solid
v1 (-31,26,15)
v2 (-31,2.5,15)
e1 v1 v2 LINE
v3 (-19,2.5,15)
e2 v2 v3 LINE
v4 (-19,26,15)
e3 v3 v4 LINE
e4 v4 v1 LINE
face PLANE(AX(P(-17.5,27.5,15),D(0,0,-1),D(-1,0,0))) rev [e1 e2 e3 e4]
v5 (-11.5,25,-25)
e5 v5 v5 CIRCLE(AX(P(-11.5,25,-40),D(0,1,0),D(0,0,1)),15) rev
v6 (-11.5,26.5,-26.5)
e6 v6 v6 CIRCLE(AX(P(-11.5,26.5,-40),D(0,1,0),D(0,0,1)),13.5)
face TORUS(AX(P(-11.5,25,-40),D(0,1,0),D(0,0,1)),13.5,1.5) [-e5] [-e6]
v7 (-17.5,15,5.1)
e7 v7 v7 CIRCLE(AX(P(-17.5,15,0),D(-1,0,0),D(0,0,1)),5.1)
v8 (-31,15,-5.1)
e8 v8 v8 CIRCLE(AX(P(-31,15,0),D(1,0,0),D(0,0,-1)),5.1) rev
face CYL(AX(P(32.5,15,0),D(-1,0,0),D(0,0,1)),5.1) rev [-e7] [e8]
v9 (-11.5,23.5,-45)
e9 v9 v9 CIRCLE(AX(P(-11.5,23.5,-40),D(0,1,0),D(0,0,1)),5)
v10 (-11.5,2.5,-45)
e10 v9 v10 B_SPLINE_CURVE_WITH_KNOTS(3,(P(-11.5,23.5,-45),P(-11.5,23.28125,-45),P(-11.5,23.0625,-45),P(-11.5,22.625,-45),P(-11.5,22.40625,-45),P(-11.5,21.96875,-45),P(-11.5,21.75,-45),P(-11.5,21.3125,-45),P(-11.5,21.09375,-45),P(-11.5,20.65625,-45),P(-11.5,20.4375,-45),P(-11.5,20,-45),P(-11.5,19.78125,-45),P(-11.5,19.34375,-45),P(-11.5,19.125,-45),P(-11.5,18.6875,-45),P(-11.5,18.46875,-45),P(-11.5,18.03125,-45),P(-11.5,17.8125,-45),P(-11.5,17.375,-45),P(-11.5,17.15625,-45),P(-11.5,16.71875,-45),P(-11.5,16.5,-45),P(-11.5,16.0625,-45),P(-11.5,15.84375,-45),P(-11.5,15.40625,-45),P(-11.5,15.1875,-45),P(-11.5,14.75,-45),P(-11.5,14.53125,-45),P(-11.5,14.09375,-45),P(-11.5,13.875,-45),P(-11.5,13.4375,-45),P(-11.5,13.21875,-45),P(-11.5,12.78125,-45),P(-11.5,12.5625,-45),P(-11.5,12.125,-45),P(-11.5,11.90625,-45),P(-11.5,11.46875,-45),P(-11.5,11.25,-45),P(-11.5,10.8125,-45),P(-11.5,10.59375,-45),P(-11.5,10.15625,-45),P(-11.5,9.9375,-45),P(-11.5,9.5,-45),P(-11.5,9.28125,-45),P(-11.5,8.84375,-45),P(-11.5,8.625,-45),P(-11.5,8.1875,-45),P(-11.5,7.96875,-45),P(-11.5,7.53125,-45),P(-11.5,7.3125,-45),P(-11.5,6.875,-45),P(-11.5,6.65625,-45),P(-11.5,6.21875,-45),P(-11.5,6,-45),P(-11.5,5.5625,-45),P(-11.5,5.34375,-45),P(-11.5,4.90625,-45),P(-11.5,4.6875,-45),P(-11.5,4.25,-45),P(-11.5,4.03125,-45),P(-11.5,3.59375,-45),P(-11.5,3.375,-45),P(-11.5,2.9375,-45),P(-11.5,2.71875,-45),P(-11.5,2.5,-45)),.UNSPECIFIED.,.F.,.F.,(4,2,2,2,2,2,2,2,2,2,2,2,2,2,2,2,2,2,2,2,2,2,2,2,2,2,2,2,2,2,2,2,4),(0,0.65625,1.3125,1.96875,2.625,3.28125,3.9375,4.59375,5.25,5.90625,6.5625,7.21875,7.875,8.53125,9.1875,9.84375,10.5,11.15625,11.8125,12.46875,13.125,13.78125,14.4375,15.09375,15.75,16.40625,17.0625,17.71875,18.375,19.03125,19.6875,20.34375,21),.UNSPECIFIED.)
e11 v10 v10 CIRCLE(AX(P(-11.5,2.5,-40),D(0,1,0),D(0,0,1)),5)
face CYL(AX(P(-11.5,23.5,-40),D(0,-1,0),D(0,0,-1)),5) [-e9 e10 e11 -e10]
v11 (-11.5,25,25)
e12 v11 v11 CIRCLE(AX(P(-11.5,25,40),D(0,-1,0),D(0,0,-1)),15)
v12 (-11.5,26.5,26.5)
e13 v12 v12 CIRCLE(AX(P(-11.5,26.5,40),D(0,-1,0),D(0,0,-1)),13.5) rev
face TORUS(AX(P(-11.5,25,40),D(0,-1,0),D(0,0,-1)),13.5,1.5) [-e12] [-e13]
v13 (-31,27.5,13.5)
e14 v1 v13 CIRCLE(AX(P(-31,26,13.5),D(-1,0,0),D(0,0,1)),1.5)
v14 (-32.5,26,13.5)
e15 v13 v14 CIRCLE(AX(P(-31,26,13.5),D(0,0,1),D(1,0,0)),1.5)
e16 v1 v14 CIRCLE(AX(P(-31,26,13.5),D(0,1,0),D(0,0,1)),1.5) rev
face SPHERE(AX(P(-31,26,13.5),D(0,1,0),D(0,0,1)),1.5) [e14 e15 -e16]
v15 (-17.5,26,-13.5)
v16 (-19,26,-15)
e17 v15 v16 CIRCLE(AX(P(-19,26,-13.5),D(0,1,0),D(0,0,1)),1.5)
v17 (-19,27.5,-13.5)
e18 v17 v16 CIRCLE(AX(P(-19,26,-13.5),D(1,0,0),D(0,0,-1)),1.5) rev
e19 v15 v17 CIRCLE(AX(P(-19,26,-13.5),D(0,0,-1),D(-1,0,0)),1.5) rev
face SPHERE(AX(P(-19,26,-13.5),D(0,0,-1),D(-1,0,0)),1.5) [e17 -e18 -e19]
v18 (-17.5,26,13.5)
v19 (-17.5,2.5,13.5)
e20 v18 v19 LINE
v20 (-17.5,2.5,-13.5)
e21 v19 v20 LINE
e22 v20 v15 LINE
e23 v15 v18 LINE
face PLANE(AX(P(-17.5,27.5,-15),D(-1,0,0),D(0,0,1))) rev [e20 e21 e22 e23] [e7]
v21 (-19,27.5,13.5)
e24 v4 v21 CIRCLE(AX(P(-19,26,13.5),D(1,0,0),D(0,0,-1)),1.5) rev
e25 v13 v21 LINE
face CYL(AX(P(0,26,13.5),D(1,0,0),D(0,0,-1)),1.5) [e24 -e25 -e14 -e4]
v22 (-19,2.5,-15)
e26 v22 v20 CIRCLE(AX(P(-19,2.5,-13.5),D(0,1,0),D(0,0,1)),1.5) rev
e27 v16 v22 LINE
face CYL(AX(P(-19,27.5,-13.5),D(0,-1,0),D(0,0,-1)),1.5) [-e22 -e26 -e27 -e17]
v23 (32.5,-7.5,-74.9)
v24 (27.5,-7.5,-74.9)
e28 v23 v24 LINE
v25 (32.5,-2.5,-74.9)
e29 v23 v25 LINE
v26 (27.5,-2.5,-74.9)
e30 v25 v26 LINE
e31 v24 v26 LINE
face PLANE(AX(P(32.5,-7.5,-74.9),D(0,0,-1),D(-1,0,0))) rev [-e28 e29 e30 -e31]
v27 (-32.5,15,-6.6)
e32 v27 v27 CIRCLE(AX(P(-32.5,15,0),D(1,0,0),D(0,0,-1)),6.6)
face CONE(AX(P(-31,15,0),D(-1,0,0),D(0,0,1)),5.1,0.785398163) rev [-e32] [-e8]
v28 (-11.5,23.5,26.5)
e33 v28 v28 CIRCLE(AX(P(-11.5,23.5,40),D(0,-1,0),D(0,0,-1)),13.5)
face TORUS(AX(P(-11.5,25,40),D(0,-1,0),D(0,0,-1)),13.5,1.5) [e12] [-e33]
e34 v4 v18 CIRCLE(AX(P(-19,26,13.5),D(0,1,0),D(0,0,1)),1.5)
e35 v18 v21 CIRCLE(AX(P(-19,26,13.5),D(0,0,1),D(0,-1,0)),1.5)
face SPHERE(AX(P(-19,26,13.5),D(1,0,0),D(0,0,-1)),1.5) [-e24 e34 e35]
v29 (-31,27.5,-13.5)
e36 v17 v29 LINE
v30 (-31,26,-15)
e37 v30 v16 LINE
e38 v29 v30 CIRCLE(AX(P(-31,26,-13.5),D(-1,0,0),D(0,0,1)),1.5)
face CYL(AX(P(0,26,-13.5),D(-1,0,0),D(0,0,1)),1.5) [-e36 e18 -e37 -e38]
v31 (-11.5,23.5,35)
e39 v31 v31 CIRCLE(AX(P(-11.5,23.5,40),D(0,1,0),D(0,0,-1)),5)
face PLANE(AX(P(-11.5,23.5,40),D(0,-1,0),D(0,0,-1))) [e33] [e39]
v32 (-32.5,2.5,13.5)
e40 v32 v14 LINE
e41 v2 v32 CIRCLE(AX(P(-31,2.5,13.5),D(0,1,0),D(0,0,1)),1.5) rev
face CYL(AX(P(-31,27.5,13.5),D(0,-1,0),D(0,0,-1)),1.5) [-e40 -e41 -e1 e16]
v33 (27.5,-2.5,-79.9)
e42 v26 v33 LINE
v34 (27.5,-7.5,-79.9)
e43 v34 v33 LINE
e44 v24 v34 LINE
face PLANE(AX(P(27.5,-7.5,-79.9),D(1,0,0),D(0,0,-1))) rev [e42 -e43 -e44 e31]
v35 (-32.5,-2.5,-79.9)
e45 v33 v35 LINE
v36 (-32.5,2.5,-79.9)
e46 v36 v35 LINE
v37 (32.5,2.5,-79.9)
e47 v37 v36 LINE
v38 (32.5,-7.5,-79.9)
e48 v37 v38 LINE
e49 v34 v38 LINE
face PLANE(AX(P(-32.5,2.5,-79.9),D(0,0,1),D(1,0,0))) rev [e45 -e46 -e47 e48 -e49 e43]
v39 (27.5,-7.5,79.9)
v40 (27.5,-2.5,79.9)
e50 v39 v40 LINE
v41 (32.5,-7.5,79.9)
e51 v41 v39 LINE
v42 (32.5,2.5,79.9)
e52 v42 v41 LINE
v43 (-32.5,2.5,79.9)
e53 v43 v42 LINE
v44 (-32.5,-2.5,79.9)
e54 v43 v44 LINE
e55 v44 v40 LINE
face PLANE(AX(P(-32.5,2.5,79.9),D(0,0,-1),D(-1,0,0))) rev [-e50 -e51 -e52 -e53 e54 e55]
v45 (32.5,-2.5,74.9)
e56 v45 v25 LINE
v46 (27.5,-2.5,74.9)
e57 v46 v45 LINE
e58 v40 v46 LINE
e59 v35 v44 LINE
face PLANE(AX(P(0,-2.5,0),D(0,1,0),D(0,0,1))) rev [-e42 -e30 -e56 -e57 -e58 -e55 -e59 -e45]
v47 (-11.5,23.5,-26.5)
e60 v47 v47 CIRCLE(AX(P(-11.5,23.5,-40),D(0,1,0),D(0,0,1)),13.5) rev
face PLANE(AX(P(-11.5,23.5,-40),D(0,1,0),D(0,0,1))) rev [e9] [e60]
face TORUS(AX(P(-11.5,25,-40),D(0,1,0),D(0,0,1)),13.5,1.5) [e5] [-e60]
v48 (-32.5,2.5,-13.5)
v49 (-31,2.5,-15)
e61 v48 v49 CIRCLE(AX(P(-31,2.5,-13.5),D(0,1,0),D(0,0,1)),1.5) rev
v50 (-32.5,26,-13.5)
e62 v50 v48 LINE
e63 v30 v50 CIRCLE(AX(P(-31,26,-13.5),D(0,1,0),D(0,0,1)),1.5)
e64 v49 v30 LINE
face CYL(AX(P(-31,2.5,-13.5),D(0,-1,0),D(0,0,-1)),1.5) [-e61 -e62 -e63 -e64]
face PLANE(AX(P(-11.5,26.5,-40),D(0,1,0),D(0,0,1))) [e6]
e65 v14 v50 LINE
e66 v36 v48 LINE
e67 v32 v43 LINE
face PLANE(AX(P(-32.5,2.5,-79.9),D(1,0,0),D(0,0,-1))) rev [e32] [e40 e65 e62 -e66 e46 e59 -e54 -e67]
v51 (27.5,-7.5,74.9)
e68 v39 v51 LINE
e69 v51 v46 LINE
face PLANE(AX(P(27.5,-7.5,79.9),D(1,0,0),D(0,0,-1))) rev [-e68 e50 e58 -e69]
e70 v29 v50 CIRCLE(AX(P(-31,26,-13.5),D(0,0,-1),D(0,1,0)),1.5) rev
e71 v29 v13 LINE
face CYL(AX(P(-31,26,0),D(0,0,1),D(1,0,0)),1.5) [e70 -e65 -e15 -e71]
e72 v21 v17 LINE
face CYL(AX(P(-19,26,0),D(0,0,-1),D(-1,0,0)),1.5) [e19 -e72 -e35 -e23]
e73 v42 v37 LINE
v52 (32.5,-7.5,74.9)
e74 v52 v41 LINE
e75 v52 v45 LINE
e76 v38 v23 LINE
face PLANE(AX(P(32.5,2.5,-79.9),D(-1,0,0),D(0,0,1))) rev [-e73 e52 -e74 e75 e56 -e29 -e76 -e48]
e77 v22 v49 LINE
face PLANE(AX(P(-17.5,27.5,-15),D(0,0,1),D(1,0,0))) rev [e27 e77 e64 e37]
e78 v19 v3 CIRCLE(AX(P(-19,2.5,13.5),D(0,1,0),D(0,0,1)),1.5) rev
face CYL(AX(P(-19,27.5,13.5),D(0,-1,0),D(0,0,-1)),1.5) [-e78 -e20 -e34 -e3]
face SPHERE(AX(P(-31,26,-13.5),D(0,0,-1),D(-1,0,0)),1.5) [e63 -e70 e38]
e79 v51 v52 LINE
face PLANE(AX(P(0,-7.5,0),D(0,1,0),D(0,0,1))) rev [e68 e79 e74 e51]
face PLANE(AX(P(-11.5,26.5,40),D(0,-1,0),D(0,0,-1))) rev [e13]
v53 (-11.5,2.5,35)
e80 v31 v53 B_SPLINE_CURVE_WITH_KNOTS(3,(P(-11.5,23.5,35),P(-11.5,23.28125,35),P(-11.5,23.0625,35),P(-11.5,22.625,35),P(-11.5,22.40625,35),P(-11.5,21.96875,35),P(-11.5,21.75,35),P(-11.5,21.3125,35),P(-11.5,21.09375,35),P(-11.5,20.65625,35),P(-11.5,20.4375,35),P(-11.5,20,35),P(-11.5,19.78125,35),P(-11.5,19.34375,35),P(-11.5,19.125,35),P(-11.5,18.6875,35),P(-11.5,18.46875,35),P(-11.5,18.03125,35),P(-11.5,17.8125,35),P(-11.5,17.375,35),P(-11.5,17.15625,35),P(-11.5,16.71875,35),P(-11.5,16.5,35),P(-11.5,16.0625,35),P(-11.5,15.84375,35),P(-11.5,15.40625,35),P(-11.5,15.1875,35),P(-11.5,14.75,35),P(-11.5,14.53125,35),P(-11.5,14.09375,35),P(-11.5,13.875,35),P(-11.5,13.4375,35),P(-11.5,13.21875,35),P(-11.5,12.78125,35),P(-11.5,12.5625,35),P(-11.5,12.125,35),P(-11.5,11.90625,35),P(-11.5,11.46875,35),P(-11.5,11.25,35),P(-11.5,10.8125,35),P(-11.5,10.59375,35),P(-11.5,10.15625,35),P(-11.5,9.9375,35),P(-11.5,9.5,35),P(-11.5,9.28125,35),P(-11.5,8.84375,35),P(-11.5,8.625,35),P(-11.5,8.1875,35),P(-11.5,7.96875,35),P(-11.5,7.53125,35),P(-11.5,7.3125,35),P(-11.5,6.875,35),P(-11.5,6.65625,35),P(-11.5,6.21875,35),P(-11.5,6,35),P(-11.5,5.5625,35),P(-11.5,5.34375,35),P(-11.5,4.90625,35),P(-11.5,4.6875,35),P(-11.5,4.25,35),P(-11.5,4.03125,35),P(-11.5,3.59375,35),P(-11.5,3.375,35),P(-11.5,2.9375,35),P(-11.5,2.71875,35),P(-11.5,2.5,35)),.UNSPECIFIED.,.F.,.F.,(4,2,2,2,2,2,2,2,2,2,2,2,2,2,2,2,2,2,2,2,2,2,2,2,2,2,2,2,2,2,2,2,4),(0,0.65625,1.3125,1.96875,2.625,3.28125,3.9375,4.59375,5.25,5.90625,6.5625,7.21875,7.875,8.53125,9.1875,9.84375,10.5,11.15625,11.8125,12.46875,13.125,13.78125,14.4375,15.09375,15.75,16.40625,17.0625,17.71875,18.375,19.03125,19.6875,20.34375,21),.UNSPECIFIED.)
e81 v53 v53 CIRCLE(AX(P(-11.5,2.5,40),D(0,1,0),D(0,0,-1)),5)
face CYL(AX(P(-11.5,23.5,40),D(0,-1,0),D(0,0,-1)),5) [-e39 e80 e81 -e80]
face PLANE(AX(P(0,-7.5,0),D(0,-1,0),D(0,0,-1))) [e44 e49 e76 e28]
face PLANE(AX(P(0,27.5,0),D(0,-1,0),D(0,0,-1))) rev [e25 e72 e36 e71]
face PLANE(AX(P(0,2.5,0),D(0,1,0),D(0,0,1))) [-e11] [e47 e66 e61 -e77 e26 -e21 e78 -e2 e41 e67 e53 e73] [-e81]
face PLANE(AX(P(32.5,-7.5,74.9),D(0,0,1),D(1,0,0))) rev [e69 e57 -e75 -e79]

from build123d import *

# Parameters (mm, degrees)
SKETCH1_W           = 65
SKETCH1_H           = 159.8
BOSS_EXTRUDE1_DEPTH = 2.5
SKETCH2_W           = 15
SKETCH2_H           = 30
BOSS_EXTRUDE2_DEPTH = 25
SKETCH3_R           = 5.1
CUT_EXTRUDE1_DEPTH  = 107.607973435
SKETCH6_W           = 5
SKETCH6_H           = 5
BOSS_EXTRUDE4_DEPTH = 5
SKETCH7_R           = 5
BOSS_EXTRUDE5_DEPTH = 21
SKETCH8_R           = 15
BOSS_EXTRUDE6_DEPTH = 3
FILLET1_R           = 1.5
CHAMFER1_SIZE       = 1.5
FILLET2_R           = 1.5


with BuildPart() as part:
    # Sketch1 → Boss-Extrude1 (new, symmetric)
    with BuildSketch(Plane(origin=(0, 0, 0), x_dir=(1, 0, 0), z_dir=(0, 1, 0))):
        Rectangle(SKETCH1_W, SKETCH1_H)
    extrude(amount=BOSS_EXTRUDE1_DEPTH, both=True)

    # Sketch2 → Boss-Extrude2 (add)
    with BuildSketch(Plane(origin=(0, 2.5, 0), x_dir=(1, 0, 0), z_dir=(0, 1, 0))):
        with Locations((-25, 0)):
            Rectangle(SKETCH2_W, SKETCH2_H)
    extrude(amount=BOSS_EXTRUDE2_DEPTH)

    # Sketch3 → Cut-Extrude1 (cut, through all)
    with BuildSketch(Plane.ZY.offset(32.5)):
        with Locations((0, 15)):
            Circle(SKETCH3_R)
    extrude(amount=-CUT_EXTRUDE1_DEPTH, mode=Mode.SUBTRACT)

    # Sketch6 → Boss-Extrude4 (add)
    with BuildSketch(Plane.XZ.offset(2.5)):
        with Locations((30, 77.4)):
            Rectangle(SKETCH6_W, SKETCH6_H)
        with Locations((30, -77.4)):
            Rectangle(SKETCH6_W, SKETCH6_H)
    extrude(amount=BOSS_EXTRUDE4_DEPTH)

    # Sketch7 → Boss-Extrude5 (add)
    with BuildSketch(Plane(origin=(0, 2.5, 0), x_dir=(1, 0, 0), z_dir=(0, 1, 0))):
        with Locations(Location((-11.5, 40, 0), (0, 0, 90))):
            Circle(SKETCH7_R)
        with Locations(Location((-11.5, -40, 0), (0, 0, 90))):
            Circle(SKETCH7_R)
    extrude(amount=BOSS_EXTRUDE5_DEPTH)

    # Sketch8 → Boss-Extrude6 (add)
    with BuildSketch(Plane(origin=(0, 23.5, 0), x_dir=(1, 0, 0), z_dir=(0, 1, 0))):
        with Locations(Location((-11.5, 40, 0), (0, 0, 270))):
            Circle(SKETCH8_R)
        with Locations(Location((-11.5, -40, 0), (0, 0, 90))):
            Circle(SKETCH8_R)
    extrude(amount=BOSS_EXTRUDE6_DEPTH)

    # Fillet1
    fillet1_edges = [part.edges().sort_by_distance(p)[0] for p in [
        (-11.5, 23.5, -55),
        (-11.5, 26.5, -55),
        (-11.5, 23.5, 55),
        (-11.5, 26.5, 55),
    ]]
    fillet(fillet1_edges, radius=FILLET1_R - 0.0001)  # a hair under: the kernel refuses the full size

    # Chamfer1
    chamfer1_edges = [part.edges().sort_by_distance(p)[0] for p in [
        (-32.5, 15, -5.1),
    ]]
    chamfer(chamfer1_edges, length=CHAMFER1_SIZE)

    # Fillet2
    fillet2_edges = [part.edges().sort_by_distance(p)[0] for p in [
        (-32.5, 15, -15),
        (-32.5, 15, 15),
        (-17.5, 15, 15),
        (-17.5, 15, -15),
        (-32.5, 27.5, 0),
        (-25, 27.5, 15),
        (-17.5, 27.5, 0),
        (-25, 27.5, -15),
    ]]
    fillet(fillet2_edges, radius=FILLET2_R)


solid = part.part
